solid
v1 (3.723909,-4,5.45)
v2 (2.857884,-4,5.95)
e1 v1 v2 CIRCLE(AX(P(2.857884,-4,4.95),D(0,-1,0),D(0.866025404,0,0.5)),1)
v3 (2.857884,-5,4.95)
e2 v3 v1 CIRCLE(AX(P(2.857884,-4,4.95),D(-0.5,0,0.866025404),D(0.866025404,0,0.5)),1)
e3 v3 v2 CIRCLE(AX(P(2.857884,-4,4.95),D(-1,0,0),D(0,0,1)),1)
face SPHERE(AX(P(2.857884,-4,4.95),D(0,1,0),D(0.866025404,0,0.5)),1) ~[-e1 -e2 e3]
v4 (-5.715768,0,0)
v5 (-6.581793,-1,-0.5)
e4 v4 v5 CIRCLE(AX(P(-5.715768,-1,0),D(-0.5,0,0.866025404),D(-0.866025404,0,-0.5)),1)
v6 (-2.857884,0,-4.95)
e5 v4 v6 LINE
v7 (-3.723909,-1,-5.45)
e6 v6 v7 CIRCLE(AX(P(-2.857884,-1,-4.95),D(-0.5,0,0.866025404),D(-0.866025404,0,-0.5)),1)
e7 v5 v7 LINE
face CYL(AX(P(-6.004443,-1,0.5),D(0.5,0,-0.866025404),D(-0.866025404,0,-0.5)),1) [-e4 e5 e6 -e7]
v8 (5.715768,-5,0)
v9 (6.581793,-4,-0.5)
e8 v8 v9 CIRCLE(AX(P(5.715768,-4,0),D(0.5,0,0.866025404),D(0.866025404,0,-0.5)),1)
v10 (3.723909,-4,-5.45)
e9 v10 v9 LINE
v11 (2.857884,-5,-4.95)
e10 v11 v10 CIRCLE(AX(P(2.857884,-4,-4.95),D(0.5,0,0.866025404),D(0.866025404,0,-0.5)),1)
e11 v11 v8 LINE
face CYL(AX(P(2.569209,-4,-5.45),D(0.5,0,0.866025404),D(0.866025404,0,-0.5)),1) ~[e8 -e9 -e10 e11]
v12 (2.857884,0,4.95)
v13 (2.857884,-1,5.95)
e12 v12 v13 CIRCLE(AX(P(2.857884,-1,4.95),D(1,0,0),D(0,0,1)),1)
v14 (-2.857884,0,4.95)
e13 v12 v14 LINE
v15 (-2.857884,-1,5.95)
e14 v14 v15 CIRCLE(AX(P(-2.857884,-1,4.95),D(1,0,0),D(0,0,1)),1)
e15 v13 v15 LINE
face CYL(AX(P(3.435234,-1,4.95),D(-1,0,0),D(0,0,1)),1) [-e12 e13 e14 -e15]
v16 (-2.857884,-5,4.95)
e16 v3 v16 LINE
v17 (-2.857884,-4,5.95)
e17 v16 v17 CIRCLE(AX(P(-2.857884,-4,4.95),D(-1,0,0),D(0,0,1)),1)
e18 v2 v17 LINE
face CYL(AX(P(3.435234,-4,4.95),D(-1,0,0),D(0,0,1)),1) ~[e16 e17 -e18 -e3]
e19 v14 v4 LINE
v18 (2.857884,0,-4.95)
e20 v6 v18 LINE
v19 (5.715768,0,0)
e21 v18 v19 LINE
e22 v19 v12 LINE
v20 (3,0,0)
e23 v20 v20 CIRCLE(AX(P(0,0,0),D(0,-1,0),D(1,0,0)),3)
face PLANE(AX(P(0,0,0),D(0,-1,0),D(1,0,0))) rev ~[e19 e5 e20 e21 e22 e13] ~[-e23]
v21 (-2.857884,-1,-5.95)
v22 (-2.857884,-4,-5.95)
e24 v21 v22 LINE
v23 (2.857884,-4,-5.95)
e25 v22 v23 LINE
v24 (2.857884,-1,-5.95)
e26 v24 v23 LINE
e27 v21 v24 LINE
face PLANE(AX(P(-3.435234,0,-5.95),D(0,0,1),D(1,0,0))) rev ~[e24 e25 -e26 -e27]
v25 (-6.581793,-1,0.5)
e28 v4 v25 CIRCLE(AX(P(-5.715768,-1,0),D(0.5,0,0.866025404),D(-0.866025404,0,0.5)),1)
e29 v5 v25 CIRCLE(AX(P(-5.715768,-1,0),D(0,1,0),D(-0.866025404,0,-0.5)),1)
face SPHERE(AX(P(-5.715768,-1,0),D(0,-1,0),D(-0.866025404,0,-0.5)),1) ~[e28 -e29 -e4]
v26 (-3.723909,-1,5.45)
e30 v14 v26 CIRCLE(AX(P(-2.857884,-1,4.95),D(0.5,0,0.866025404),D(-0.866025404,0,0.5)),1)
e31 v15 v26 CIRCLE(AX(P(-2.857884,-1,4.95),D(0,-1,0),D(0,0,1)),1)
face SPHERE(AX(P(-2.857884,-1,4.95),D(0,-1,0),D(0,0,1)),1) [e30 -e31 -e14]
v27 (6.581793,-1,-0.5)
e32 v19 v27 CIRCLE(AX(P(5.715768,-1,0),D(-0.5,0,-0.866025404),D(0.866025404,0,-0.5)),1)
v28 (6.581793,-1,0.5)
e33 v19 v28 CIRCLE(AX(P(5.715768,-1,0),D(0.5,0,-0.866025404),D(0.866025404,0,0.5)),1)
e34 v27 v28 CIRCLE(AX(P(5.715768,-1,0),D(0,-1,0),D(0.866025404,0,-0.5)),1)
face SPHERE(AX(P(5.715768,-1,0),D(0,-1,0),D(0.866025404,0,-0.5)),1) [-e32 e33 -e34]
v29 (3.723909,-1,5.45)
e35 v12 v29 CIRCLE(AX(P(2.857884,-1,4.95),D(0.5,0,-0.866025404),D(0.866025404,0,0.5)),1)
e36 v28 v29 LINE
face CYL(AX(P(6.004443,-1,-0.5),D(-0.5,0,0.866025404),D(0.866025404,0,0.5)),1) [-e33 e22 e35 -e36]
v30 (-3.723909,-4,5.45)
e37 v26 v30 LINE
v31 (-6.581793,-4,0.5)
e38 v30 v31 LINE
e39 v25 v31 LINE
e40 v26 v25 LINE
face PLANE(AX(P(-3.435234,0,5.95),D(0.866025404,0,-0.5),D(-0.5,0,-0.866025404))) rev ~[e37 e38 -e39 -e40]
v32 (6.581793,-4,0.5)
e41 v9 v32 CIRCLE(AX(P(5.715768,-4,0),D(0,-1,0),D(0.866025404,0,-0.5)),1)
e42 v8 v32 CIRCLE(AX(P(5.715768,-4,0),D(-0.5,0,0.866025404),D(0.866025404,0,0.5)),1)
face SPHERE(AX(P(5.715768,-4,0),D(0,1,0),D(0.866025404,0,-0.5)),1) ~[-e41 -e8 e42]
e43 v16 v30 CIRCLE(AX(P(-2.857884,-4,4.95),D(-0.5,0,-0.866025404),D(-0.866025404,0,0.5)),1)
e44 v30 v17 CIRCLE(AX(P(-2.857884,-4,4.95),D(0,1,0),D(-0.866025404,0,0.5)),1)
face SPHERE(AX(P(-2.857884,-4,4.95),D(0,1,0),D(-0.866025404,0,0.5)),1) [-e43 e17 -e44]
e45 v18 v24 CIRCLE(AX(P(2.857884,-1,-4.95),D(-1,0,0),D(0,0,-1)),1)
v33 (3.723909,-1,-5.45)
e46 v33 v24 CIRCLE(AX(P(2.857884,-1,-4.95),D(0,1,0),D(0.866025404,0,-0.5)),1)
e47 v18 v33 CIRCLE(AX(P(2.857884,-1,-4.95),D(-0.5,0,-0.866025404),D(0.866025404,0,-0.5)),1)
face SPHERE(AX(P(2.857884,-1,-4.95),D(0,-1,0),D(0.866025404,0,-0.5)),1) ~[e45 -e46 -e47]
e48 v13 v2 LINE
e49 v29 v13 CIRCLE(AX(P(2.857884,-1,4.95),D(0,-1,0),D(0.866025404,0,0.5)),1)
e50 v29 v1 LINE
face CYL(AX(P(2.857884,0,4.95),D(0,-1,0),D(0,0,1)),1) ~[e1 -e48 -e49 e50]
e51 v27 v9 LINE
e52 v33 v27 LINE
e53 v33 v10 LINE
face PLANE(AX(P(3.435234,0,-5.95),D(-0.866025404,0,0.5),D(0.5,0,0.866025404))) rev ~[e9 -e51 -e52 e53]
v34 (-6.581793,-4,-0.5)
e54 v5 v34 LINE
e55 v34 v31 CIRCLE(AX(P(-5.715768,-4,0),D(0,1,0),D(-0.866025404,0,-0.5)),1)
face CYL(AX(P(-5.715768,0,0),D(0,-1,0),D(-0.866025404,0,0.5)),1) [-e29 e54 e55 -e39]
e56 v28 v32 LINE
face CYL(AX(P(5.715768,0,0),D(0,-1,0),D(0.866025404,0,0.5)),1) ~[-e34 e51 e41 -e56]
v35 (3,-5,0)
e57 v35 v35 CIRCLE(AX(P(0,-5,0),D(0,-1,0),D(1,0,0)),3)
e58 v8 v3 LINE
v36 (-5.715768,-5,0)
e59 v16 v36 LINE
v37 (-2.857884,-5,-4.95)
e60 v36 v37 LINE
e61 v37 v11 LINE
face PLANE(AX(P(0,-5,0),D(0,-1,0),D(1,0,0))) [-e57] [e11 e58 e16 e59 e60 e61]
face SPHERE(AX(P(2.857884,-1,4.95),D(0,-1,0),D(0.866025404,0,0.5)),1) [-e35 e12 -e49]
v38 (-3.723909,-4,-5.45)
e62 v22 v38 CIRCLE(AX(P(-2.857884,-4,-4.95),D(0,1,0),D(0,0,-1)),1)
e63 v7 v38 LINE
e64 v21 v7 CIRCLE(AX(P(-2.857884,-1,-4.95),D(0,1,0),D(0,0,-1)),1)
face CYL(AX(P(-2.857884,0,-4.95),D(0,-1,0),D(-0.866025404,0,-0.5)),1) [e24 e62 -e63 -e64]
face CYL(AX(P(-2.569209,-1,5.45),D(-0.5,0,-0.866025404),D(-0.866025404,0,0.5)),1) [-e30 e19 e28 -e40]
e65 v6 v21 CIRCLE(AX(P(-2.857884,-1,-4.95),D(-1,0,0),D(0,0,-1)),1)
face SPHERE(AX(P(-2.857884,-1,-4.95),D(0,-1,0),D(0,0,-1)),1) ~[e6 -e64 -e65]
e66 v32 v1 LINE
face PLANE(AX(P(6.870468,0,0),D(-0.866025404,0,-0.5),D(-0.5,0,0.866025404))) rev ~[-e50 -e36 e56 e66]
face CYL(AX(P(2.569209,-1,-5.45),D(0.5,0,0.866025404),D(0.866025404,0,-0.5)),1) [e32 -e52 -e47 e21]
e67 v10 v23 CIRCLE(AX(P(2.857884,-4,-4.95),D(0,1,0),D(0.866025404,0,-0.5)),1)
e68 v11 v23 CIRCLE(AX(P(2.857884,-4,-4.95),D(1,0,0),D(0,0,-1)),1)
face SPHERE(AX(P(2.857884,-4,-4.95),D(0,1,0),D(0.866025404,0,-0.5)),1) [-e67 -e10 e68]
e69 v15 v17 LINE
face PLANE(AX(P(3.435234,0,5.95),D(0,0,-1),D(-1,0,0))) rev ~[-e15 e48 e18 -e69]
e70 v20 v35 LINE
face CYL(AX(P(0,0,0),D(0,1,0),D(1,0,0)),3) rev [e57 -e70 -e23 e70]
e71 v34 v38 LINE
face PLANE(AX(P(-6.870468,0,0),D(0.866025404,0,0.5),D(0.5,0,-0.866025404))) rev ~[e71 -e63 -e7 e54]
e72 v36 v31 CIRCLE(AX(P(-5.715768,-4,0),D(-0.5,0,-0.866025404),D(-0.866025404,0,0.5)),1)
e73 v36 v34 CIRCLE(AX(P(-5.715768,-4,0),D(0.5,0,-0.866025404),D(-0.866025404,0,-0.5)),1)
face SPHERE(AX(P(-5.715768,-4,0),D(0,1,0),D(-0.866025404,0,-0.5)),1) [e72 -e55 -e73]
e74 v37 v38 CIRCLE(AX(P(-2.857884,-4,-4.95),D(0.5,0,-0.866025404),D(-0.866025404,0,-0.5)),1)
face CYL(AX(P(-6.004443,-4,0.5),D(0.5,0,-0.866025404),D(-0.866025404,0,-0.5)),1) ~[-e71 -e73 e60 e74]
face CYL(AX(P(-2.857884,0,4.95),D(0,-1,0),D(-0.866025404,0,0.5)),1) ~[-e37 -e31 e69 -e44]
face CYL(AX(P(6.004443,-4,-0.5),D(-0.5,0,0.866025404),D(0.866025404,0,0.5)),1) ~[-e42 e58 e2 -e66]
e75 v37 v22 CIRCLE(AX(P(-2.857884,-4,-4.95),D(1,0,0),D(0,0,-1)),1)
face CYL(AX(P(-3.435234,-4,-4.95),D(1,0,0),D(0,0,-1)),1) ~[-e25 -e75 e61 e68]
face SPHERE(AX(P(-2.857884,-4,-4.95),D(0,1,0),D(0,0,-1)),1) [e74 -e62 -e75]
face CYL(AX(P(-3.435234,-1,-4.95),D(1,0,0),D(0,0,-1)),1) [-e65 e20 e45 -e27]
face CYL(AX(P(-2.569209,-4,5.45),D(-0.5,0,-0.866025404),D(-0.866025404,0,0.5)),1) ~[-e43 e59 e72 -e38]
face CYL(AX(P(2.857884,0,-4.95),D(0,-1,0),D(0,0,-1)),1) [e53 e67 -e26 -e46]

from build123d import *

# Parameters (mm, degrees)
F0_R     = 3
F1_DEPTH = 5
F2_R     = 1


# Not quite as in the source:
# - a feature names something its author has since deleted; it is built from what else it names


with BuildPart() as f1:
    # F0 (on Front) → F1 (new body)
    with BuildSketch(Plane.XZ):
        Polygon((-3.4352341017, 5.95), (-6.8704682034, 0), (-3.4352341017, -5.95), (3.4352341017, -5.95), (6.8704682034, 0), (3.4352341017, 5.95), align=None)
        Circle(F0_R, mode=Mode.SUBTRACT)
    extrude(amount=F1_DEPTH)

    # F2
    f2_edges = [f1.edges().sort_by_distance(p)[0] for p in [
        (-3.435234, -2.5, 5.95),
        (-6.870468, -2.5, 0),
        (-3.435234, -2.5, -5.95),
        (3.435234, -2.5, 5.95),
        (6.870468, -2.5, 0),
        (3.435234, -2.5, -5.95),
        (5.152851, -5, -2.975),
        (5.152851, 0, -2.975),
        (5.152851, 0, 2.975),
        (5.152851, -5, 2.975),
        (0, -5, -5.95),
        (0, 0, -5.95),
        (-5.152851, 0, -2.975),
        (-5.152851, -5, -2.975),
        (-5.152851, -5, 2.975),
        (0, -5, 5.95),
        (0, 0, 5.95),
        (-5.152851, 0, 2.975),
    ]]
    fillet(f2_edges, radius=F2_R)


solid = f1.part
